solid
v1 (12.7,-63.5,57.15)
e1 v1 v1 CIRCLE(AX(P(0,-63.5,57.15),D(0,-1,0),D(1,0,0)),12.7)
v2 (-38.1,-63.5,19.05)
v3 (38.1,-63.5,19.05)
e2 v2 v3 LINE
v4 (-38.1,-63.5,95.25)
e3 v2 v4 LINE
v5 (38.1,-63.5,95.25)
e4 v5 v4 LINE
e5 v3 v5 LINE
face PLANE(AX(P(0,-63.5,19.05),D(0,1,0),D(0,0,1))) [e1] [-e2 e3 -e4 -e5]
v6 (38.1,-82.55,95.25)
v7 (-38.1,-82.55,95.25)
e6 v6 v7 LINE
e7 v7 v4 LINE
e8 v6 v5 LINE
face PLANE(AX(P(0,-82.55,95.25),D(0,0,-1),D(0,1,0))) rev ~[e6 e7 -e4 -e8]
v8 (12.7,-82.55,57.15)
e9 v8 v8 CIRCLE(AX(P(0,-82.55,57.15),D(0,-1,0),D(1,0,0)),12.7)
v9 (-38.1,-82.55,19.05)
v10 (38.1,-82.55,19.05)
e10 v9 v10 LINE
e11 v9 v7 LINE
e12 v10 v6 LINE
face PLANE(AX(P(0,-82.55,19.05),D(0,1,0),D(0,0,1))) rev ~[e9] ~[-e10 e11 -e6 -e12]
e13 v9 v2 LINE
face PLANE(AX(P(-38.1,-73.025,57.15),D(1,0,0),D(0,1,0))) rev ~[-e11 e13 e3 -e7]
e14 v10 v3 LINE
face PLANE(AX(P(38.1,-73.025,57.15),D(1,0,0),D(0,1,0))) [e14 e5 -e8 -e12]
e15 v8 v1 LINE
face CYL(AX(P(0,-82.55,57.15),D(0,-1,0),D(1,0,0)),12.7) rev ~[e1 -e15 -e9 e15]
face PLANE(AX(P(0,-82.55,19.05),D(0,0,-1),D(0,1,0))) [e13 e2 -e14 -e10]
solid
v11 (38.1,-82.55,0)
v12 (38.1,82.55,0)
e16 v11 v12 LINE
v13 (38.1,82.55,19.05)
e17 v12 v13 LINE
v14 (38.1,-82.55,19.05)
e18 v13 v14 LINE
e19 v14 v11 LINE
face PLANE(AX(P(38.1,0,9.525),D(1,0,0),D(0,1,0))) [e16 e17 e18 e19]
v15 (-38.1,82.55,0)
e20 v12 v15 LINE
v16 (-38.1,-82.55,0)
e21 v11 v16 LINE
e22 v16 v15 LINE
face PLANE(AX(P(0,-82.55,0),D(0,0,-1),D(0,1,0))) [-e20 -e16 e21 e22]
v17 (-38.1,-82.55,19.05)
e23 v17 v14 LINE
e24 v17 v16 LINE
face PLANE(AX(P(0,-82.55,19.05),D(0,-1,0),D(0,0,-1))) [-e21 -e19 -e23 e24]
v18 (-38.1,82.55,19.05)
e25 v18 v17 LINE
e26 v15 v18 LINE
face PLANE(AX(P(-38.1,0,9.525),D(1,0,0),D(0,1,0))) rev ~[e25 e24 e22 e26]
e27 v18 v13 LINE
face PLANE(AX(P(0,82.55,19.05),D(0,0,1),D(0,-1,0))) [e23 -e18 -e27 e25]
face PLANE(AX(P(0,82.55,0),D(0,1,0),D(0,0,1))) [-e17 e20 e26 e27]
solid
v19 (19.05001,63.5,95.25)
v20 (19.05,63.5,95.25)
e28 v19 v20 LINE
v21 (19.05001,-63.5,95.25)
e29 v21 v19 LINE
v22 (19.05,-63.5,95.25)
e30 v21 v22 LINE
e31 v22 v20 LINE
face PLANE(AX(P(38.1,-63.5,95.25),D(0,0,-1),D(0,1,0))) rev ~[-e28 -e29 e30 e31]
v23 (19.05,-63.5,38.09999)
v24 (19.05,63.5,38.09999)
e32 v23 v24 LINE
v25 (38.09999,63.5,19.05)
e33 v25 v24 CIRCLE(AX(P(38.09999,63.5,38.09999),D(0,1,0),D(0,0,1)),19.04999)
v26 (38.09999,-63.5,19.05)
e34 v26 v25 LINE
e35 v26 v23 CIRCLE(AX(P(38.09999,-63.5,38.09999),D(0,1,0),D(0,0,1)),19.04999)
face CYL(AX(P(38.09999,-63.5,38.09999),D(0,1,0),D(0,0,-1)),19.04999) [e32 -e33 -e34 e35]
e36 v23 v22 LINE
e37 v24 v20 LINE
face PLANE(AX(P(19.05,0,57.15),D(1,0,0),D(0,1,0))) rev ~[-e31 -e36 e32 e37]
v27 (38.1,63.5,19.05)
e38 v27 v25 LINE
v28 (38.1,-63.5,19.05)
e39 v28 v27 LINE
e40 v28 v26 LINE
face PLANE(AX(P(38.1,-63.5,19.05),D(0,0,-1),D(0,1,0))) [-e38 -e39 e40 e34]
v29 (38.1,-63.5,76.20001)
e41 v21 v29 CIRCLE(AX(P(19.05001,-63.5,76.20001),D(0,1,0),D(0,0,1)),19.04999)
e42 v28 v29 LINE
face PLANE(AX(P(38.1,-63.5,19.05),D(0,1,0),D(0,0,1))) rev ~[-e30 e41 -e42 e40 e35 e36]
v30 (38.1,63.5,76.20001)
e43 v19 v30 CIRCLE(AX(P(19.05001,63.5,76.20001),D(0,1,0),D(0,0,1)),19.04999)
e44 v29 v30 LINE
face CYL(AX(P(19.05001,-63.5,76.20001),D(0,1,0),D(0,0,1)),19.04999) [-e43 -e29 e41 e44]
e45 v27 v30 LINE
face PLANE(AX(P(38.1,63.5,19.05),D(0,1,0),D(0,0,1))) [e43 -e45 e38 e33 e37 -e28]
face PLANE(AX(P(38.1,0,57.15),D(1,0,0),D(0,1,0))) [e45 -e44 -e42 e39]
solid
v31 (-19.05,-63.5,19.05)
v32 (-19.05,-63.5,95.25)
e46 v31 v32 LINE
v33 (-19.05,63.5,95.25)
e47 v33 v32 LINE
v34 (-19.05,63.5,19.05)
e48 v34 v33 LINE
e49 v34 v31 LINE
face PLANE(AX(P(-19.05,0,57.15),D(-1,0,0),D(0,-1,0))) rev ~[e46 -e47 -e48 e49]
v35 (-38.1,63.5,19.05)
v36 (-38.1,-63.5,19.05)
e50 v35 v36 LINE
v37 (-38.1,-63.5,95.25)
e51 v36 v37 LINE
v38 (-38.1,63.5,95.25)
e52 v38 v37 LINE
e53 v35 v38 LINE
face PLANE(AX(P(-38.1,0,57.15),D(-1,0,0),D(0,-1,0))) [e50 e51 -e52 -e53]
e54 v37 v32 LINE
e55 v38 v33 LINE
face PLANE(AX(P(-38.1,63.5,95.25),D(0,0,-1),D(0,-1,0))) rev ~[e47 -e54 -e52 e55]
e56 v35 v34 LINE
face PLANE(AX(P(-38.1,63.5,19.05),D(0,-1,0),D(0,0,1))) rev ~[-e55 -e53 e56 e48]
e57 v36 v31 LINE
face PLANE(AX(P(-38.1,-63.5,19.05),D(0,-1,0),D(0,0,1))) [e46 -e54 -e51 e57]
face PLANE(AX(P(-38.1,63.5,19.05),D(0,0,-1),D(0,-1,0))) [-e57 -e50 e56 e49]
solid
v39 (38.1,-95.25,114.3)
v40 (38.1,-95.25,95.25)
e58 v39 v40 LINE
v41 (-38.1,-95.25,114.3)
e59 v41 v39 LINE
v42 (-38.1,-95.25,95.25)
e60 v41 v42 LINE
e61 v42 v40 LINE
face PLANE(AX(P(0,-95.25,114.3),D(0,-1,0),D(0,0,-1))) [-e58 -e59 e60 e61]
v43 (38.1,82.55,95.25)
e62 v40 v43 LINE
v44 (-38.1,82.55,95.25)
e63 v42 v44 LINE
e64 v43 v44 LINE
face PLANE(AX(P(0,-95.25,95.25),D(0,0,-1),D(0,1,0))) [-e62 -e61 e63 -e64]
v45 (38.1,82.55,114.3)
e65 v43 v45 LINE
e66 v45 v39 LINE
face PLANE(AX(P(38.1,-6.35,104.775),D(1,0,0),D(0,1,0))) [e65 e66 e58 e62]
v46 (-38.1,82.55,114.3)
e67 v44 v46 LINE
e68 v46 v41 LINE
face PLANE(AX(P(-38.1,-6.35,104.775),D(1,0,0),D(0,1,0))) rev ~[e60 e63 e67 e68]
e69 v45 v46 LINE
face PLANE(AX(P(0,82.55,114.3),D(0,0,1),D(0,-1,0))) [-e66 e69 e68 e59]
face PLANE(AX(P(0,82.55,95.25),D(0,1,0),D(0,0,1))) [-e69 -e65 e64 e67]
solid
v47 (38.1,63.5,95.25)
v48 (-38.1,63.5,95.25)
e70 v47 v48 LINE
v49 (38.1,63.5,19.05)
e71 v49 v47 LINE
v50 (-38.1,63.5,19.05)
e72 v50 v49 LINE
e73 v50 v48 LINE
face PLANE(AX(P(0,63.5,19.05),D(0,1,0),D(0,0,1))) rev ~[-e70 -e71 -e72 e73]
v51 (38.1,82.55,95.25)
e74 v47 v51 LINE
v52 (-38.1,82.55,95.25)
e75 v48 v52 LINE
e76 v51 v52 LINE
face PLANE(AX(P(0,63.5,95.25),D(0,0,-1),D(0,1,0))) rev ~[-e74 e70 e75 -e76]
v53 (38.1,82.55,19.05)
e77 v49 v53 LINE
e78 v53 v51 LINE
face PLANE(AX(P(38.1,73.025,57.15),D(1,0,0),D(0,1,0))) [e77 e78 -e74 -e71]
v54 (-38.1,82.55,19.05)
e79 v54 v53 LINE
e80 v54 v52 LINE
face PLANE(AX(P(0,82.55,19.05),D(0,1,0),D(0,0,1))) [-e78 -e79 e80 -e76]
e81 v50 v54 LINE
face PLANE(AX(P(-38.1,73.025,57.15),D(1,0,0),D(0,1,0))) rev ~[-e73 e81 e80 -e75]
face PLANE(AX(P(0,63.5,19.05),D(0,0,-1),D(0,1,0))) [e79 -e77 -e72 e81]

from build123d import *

# Parameters (mm, degrees)
F2_DEPTH  = 38.1
F1_W      = 19.05
F1_H      = 76.2
F3_DEPTH  = 38.1
F4_DEPTH  = 38.1
F5_DEPTH  = 38.1
F6_R      = 12.7
F7_DEPTH  = 19.05
F8_W      = 127
F8_H      = 76.2
F9_DEPTH  = 19.05
F10_W     = 127
F10_H     = 76.2
F11_DEPTH = 19.05
F12_R     = 19.04999


# Not quite as in the source:
# - a variable given as a bare number and used for a length is read in inches; the dataset says mm whatever the document's units were
# - a fillet or chamfer is up to 0.001 mm smaller than in the source, because OpenCascade refuses the exact size
# - a feature names something its author has since deleted; it is built from what else it names


with BuildPart() as f2:
    # F1 (on Right) → F2 (new body, symmetric)
    with BuildSketch(Plane.YZ):
        Polygon((82.55, 0), (82.55, 19.05), (63.5, 19.05), (-63.5, 19.05), (-82.55, 19.05), (-82.55, 0), align=None)
    extrude(amount=F2_DEPTH, both=True)


with BuildPart() as f3:
    # F1 (on Right) → F3 (new body, symmetric)
    with BuildSketch(Plane.YZ):
        with Locations((73.025, 57.15)):
            Rectangle(F1_W, F1_H)
    extrude(amount=F3_DEPTH, both=True)


with BuildPart() as f4:
    # F1 (on Right) → F4 (new body, symmetric)
    with BuildSketch(Plane.YZ):
        Polygon((82.55, 114.3), (-95.25, 114.3), (-95.25, 95.25), (-82.55, 95.25), (-63.5, 95.25), (63.5, 95.25), (82.55, 95.25), align=None)
    extrude(amount=F4_DEPTH, both=True)


with BuildPart() as f5:
    # F1 (on Right) → F5 (new body, symmetric)
    with BuildSketch(Plane.YZ):
        with Locations((-73.025, 57.15)):
            Rectangle(F1_W, F1_H)
    extrude(amount=F5_DEPTH, both=True)

    # F6 (on face) → F7 (cut, through all)
    with BuildSketch(Plane.XZ.offset(82.55)):
        with Locations((0, 57.15)):
            Circle(F6_R)
    extrude(amount=-F7_DEPTH, mode=Mode.SUBTRACT)


with BuildPart() as f9:
    # F8 (on face) → F9 (new body)
    with BuildSketch(Plane(origin=(-38.1, 0, 0), x_dir=(0, -1, 0), z_dir=(-1, 0, 0))):
        with Locations((0, 57.15)):
            Rectangle(F8_W, F8_H)
    extrude(amount=-F9_DEPTH)


with BuildPart() as f11:
    # F10 (on face) → F11 (new body)
    with BuildSketch(Plane.YZ.offset(38.1)):
        with Locations((0, 57.15)):
            Rectangle(F10_W, F10_H)
    extrude(amount=-F11_DEPTH)

    # F12 (radius 19.05 in the source; OpenCascade refuses exactly that, so slightly less here)
    f12_edges = [f11.edges().sort_by_distance(p)[0] for p in [
        (38.1, 0, 95.25),
        (19.05, 0, 19.05),
    ]]
    fillet(f12_edges, radius=F12_R)


solid = Compound([f2.part, f3.part, f4.part, f5.part, f9.part, f11.part])
